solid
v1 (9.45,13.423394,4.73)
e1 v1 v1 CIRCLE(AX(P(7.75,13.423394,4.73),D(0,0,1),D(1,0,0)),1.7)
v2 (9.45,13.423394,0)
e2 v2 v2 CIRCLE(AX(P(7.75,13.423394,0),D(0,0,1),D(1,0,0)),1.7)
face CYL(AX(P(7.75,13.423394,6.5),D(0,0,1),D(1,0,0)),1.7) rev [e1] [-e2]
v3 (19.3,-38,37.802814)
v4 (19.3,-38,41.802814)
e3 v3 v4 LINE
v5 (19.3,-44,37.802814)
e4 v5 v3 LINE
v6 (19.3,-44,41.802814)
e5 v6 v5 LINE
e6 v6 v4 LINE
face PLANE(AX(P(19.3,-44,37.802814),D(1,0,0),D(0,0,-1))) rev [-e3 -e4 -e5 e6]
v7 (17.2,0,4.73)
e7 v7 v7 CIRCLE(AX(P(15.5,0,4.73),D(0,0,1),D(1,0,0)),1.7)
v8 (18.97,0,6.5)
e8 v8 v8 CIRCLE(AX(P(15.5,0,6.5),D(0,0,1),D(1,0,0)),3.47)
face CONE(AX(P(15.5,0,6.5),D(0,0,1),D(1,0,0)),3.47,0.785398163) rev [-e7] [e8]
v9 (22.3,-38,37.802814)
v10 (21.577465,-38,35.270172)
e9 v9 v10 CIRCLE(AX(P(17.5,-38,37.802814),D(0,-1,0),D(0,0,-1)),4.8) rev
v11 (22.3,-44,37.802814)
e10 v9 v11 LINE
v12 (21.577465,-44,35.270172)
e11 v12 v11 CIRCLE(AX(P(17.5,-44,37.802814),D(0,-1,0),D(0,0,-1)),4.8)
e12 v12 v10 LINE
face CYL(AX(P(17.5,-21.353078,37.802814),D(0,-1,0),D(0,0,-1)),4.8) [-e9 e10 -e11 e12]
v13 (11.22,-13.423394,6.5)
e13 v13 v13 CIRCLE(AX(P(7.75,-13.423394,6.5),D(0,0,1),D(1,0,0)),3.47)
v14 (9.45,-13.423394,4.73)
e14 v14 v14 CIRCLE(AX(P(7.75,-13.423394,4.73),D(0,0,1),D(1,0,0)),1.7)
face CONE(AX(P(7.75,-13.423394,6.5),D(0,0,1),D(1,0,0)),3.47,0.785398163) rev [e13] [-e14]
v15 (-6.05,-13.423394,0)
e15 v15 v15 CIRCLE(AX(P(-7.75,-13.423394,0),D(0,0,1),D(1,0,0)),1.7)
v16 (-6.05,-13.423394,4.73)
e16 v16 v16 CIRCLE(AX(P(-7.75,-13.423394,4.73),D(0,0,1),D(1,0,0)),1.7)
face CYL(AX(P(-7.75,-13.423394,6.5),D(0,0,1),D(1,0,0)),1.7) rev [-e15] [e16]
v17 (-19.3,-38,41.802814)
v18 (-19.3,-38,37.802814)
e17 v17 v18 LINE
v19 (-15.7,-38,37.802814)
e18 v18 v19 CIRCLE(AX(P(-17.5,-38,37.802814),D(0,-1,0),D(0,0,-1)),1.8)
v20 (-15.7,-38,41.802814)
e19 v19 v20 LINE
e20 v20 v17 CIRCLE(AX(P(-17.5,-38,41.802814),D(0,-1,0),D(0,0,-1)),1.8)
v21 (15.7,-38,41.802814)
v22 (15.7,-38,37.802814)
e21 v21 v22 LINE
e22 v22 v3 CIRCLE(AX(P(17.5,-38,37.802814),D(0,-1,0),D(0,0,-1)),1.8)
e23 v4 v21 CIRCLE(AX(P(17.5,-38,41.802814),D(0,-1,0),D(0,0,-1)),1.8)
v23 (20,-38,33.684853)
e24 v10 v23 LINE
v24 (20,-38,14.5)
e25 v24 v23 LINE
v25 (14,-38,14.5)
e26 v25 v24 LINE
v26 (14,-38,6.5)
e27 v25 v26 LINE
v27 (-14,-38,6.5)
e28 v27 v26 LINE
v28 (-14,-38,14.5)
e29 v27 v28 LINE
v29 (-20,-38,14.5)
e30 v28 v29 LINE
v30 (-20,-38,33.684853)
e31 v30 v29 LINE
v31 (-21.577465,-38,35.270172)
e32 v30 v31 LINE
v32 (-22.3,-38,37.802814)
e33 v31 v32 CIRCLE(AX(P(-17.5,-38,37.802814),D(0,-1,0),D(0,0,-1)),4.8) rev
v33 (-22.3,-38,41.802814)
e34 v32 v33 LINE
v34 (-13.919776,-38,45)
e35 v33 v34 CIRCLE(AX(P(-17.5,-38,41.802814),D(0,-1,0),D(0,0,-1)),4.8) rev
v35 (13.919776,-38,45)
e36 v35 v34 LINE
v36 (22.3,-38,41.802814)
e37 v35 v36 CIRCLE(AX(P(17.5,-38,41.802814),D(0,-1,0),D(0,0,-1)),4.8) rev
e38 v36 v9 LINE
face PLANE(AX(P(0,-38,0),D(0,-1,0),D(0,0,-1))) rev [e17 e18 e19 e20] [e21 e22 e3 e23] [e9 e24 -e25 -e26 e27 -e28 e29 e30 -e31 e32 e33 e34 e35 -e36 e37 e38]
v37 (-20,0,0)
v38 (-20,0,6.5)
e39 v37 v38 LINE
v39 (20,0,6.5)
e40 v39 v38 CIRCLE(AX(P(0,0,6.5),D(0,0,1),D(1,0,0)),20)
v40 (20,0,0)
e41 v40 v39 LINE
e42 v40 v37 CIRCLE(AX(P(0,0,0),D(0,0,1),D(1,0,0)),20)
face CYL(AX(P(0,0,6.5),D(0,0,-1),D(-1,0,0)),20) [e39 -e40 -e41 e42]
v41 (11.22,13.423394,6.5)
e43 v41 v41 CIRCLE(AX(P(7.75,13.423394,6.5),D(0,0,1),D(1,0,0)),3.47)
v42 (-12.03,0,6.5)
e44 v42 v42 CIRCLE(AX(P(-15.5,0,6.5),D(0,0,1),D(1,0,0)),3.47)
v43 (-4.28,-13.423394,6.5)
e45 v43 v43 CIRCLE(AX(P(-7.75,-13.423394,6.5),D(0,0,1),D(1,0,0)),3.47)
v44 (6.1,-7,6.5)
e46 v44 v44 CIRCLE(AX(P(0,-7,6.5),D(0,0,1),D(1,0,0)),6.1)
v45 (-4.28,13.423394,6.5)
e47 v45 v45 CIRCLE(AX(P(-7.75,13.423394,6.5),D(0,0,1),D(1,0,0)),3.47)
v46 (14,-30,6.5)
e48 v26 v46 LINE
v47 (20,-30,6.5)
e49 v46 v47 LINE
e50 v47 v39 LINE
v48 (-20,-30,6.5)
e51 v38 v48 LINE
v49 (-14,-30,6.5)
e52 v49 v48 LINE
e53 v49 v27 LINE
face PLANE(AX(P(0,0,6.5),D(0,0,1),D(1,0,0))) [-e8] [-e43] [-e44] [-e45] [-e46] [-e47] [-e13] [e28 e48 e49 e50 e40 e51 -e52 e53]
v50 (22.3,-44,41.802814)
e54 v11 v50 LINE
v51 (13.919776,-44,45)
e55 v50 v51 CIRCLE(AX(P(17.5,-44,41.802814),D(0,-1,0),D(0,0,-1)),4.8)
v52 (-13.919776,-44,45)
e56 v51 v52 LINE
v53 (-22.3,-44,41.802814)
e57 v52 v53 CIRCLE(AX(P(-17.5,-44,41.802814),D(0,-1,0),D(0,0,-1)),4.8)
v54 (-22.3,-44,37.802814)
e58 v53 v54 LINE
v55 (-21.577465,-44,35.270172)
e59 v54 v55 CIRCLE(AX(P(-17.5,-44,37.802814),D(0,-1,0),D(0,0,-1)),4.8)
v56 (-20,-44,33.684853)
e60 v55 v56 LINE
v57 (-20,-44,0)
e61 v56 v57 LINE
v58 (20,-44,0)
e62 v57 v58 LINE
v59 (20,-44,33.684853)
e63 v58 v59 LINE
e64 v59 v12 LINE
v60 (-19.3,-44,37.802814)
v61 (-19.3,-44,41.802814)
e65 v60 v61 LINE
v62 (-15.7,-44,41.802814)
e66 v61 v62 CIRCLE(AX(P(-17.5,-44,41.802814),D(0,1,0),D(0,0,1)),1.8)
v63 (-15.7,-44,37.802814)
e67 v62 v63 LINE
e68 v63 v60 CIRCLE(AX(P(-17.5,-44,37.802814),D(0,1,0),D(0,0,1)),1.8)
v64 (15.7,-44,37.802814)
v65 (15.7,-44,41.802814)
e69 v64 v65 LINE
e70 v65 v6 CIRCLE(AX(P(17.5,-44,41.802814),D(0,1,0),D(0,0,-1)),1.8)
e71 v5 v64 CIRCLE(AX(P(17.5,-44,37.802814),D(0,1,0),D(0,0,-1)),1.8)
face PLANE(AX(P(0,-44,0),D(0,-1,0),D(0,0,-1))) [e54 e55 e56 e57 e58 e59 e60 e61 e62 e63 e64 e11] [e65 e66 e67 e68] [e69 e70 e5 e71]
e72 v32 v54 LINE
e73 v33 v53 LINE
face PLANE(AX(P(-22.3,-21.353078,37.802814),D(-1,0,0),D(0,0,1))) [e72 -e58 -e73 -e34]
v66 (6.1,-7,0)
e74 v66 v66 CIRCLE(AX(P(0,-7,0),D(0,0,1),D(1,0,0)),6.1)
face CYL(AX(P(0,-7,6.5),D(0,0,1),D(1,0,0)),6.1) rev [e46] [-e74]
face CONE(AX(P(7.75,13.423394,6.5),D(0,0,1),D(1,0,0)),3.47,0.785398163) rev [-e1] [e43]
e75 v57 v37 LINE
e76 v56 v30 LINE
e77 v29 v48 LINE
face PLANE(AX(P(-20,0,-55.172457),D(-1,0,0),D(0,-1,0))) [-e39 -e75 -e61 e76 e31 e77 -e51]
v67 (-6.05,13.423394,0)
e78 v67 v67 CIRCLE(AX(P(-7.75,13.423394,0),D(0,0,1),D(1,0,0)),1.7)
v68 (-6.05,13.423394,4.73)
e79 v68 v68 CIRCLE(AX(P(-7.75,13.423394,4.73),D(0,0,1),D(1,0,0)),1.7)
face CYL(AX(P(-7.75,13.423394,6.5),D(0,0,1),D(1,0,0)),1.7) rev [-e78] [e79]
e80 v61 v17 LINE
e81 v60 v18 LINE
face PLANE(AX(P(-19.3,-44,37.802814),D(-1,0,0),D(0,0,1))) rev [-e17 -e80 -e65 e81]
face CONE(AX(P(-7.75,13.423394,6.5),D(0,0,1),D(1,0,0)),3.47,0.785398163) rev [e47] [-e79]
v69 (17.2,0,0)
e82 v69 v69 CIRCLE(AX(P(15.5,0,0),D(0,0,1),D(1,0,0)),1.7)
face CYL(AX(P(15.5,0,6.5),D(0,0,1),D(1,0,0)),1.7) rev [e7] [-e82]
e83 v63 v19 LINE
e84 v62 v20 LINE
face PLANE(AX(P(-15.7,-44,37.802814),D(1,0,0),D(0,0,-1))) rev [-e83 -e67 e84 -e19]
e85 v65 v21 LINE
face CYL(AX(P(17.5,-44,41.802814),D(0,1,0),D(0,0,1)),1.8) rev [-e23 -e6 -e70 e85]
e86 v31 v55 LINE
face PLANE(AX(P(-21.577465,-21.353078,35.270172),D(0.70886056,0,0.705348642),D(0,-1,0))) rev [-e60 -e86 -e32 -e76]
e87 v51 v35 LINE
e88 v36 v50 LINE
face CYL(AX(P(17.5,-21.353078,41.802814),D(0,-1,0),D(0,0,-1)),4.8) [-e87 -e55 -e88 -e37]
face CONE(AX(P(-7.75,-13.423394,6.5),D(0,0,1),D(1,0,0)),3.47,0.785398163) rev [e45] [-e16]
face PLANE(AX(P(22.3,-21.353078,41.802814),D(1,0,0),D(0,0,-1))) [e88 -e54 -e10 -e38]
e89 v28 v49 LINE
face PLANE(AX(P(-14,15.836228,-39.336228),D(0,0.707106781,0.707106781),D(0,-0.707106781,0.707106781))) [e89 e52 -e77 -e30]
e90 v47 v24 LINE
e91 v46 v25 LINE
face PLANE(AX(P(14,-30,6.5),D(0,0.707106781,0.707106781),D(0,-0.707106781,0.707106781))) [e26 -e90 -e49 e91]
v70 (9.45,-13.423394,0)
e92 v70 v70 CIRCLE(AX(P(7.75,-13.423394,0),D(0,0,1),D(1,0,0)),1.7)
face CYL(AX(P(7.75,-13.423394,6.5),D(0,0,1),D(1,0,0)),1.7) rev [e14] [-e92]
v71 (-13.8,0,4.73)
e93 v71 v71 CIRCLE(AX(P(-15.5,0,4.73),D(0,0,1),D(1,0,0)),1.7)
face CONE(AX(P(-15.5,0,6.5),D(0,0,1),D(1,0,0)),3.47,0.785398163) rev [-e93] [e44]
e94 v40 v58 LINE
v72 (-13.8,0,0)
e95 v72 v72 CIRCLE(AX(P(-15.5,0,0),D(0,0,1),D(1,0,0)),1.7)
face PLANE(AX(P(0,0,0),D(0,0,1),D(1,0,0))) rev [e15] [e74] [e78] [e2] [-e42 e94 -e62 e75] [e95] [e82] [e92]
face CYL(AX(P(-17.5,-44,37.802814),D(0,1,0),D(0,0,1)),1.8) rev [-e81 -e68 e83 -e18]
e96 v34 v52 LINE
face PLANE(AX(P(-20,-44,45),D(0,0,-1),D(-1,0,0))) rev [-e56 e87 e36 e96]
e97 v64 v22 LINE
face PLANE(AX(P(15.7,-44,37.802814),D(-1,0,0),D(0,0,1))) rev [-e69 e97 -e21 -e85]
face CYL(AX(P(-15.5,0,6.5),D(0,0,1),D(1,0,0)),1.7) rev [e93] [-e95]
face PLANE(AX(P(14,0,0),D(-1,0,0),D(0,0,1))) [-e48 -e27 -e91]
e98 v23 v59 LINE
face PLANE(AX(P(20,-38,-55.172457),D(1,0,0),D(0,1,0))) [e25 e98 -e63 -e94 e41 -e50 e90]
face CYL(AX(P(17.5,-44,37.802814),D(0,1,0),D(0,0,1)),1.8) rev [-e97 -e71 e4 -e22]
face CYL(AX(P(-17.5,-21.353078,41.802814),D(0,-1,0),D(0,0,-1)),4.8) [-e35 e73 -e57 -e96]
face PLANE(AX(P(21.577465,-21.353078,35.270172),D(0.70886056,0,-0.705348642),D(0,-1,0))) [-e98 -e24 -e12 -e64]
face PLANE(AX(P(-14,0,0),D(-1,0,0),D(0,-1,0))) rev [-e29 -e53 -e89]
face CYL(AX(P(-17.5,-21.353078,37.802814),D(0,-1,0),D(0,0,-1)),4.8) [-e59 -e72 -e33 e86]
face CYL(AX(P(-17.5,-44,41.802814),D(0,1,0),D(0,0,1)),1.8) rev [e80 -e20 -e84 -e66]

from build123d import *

# Parameters (mm, degrees)
SKETCH1_R                                            = 20
BOSS_EXTRUDE1_DEPTH                                  = 6.5
CSK_FOR_M3_HEX_SOCKET_COUNTERSUNK_HEAD_S_D           = 3.4
CSK_FOR_M3_HEX_SOCKET_COUNTERSUNK_HEAD_S_CSINK_D     = 6.94
CSK_FOR_M3_HEX_SOCKET_COUNTERSUNK_HEAD_S_CSINK_ANGLE = 90
F_12_2_12_2_DIAMETER_HOLE1_D                         = 12.2
BOSS_EXTRUDE2_START                                  = -6.5
BOSS_EXTRUDE2_DEPTH                                  = 6.5
SKETCH7_W                                            = 40
SKETCH7_H                                            = 45
BOSS_EXTRUDE3_DEPTH                                  = 6
M3_CLEARANCE_HOLE2_D                                 = 3.6
CUT_EXTRUDE1_DEPTH                                   = 77.085478247
CUT_EXTRUDE1_DEPTH_BACK                              = 77.085478247
BOSS_EXTRUDE4_DEPTH                                  = 6
CHAMFER1_START                                       = -45
CHAMFER1_DEPTH                                       = 8
CHAMFER1_START_2                                     = -44
CHAMFER1_2_DEPTH                                     = 6
BOSS_EXTRUDE5_DEPTH                                  = 6
BOSS_EXTRUDE6_START                                  = -40
BOSS_EXTRUDE6_DEPTH                                  = 6


with BuildPart() as part:
    # Sketch1 → Boss-Extrude1 (new body)
    with BuildSketch(Plane.XY):
        with Locations(Location((0, 0, 0), (0, 0, 180))):
            Circle(SKETCH1_R)
    extrude(amount=BOSS_EXTRUDE1_DEPTH)

    # CSK for M3 Hex Socket Countersunk Head Screw1 (through all)
    with Locations(Plane.XY.offset(6.5)):
        with Locations((-7.75, -13.423393759), (-15.5, 0), (-7.75, 13.423393759), (7.75, 13.423393759), (15.5, 0), (7.75, -13.423393759)):
            CounterSinkHole(CSK_FOR_M3_HEX_SOCKET_COUNTERSUNK_HEAD_S_D / 2, CSK_FOR_M3_HEX_SOCKET_COUNTERSUNK_HEAD_S_CSINK_D / 2, counter_sink_angle=CSK_FOR_M3_HEX_SOCKET_COUNTERSUNK_HEAD_S_CSINK_ANGLE)

    # Ø12.2 (12.2) Diameter Hole1 (through all)
    with Locations(Plane.XY.offset(6.5)):
        with Locations((0, -7)):
            Hole(F_12_2_12_2_DIAMETER_HOLE1_D / 2)

    # Sketch6 → Boss-Extrude2 (add)
    with BuildSketch(Plane.XY.offset(6.5).offset(BOSS_EXTRUDE2_START)):
        with BuildLine():
            Line((-20, 0), (-20, -38))
            Line((-20, -38), (20, -38))
            Line((20, -38), (20, 0))
            ThreePointArc((20, 0), (0, -20), (-20, 0))
        make_face()
    extrude(amount=BOSS_EXTRUDE2_DEPTH)

    # Sketch7 → Boss-Extrude3 (add)
    with BuildSketch(Plane.XZ.offset(38)):
        with Locations((0, 22.5)):
            Rectangle(SKETCH7_W, SKETCH7_H)
    extrude(amount=BOSS_EXTRUDE3_DEPTH)

    # M3 Clearance Hole2 (through all)
    with Locations(Plane(origin=(0, -44, 0), x_dir=(-1, 0, 0), z_dir=(0, -1, 0))):
        with Locations((-17.5, -39.802814471), (17.5, -39.802814471)):
            Hole(M3_CLEARANCE_HOLE2_D / 2)

    # Sketch11 → Cut-Extrude1 (cut, two sides: drawn at the far end of the back side and taken through both)
    with BuildSketch(Plane(origin=(0, -38, 0), x_dir=(1, 0, 0), z_dir=(0, 1, 0)).offset(-CUT_EXTRUDE1_DEPTH_BACK)):
        with BuildLine():
            Line((-15.7, -37.802814471), (-15.7, -41.802814471))
            ThreePointArc((-15.7, -41.802814471), (-17.5, -43.602814471), (-19.3, -41.802814471))
            Line((-19.3, -41.802814471), (-19.3, -37.802814471))
            ThreePointArc((-19.3, -37.802814471), (-17.5, -36.002814471), (-15.7, -37.802814471))
        make_face()
        with BuildLine():
            Line((15.7, -37.802814471), (15.7, -41.802814471))
            ThreePointArc((15.7, -41.802814471), (17.5, -43.602814471), (19.3, -41.802814471))
            Line((19.3, -41.802814471), (19.3, -37.802814471))
            ThreePointArc((19.3, -37.802814471), (17.5, -36.002814471), (15.7, -37.802814471))
        make_face()
    extrude(amount=CUT_EXTRUDE1_DEPTH + CUT_EXTRUDE1_DEPTH_BACK, mode=Mode.SUBTRACT)

    # Sketch10 → Boss-Extrude4 (add)
    # profile 1 of 2: a face of its own
    with BuildSketch(Plane.XZ.offset(44)):
        with BuildLine():
            Line((-22.3, 37.802814471), (-22.3, 41.802814471))
            ThreePointArc((-22.3, 41.802814471), (-17.5, 46.602814471), (-12.7, 41.802814471))
            Line((-12.7, 41.802814471), (-12.7, 37.802814471))
            ThreePointArc((-12.7, 37.802814471), (-17.5, 33.002814471), (-22.3, 37.802814471))
        make_face()
        with BuildLine():
            Line((-19.3, 37.802814471), (-19.3, 41.802814471))
            ThreePointArc((-19.3, 41.802814471), (-17.5, 43.602814471), (-15.7, 41.802814471))
            Line((-15.7, 41.802814471), (-15.7, 37.802814471))
            ThreePointArc((-15.7, 37.802814471), (-17.5, 36.002814471), (-19.3, 37.802814471))
        make_face(mode=Mode.SUBTRACT)
    # profile 2 of 2: a face of its own
    with BuildSketch(Plane.XZ.offset(44)):
        with BuildLine():
            Line((22.3, 41.802814471), (22.3, 37.802814471))
            ThreePointArc((22.3, 37.802814471), (17.5, 33.002814471), (12.7, 37.802814471))
            Line((12.7, 37.802814471), (12.7, 41.802814471))
            ThreePointArc((12.7, 41.802814471), (17.5, 46.602814471), (22.3, 41.802814471))
        make_face()
        with BuildLine():
            Line((19.3, 41.802814471), (19.3, 37.802814471))
            ThreePointArc((19.3, 37.802814471), (17.5, 36.002814471), (15.7, 37.802814471))
            Line((15.7, 37.802814471), (15.7, 41.802814471))
            ThreePointArc((15.7, 41.802814471), (17.5, 43.602814471), (19.3, 41.802814471))
        make_face(mode=Mode.SUBTRACT)
    extrude(amount=-BOSS_EXTRUDE4_DEPTH)

    # Chamfer1: read off the stored shape, not the designer's step
    # Chamfer1 outline → Chamfer1 (cut)
    with BuildSketch(Plane(origin=(0, 0, 0), x_dir=(1, 0, 0), z_dir=(0, 1, 0)).offset(CHAMFER1_START)):
        with BuildLine():
            Line((20.05286265, -33.7379784), (21.57746495, -35.270171666))
            ThreePointArc((21.57746495, -35.270171666), (20.902530686, -34.417140989), (20.05286265, -33.7379784))
        make_face()
        with BuildLine():
            ThreePointArc((-20.05286265, -33.7379784), (-20.902530686, -34.417140989), (-21.57746495, -35.270171666))
            Line((-21.57746495, -35.270171666), (-20.05286265, -33.7379784))
        make_face()
    extrude(amount=CHAMFER1_DEPTH, mode=Mode.SUBTRACT)

    # Chamfer1 2 outline → Chamfer1 2 (add)
    with BuildSketch(Plane(origin=(0, 0, 0), x_dir=(1, 0, 0), z_dir=(0, 1, 0)).offset(CHAMFER1_START_2)):
        with BuildLine():
            ThreePointArc((20, -33.705254222), (20.026484308, -33.721530722), (20.05286265, -33.7379784))
            Line((20.05286265, -33.7379784), (20, -33.684852548))
            Line((20, -33.684852548), (20, -33.705254222))
        make_face()
        with BuildLine():
            Line((-20, -33.684852548), (-20.05286265, -33.7379784))
            ThreePointArc((-20.05286265, -33.7379784), (-20.026484308, -33.721530722), (-20, -33.705254222))
            Line((-20, -33.705254222), (-20, -33.684852548))
        make_face()
    extrude(amount=CHAMFER1_2_DEPTH)

    # Sketch12 → Boss-Extrude5 (add)
    with BuildSketch(Plane(origin=(20, 0, 0), x_dir=(0, 0, -1), z_dir=(1, 0, 0))):
        Polygon((-6.5, -30), (-14.5, -38), (-6.5, -38), align=None)
    extrude(amount=-BOSS_EXTRUDE5_DEPTH)

    # Sketch12<2> → Boss-Extrude6 (add)
    with BuildSketch(Plane(origin=(20, 0, 0), x_dir=(0, 0, -1), z_dir=(1, 0, 0)).offset(BOSS_EXTRUDE6_START)):
        Polygon((-6.5, -30), (-14.5, -38), (-6.5, -38), align=None)
    extrude(amount=BOSS_EXTRUDE6_DEPTH)


solid = part.part
